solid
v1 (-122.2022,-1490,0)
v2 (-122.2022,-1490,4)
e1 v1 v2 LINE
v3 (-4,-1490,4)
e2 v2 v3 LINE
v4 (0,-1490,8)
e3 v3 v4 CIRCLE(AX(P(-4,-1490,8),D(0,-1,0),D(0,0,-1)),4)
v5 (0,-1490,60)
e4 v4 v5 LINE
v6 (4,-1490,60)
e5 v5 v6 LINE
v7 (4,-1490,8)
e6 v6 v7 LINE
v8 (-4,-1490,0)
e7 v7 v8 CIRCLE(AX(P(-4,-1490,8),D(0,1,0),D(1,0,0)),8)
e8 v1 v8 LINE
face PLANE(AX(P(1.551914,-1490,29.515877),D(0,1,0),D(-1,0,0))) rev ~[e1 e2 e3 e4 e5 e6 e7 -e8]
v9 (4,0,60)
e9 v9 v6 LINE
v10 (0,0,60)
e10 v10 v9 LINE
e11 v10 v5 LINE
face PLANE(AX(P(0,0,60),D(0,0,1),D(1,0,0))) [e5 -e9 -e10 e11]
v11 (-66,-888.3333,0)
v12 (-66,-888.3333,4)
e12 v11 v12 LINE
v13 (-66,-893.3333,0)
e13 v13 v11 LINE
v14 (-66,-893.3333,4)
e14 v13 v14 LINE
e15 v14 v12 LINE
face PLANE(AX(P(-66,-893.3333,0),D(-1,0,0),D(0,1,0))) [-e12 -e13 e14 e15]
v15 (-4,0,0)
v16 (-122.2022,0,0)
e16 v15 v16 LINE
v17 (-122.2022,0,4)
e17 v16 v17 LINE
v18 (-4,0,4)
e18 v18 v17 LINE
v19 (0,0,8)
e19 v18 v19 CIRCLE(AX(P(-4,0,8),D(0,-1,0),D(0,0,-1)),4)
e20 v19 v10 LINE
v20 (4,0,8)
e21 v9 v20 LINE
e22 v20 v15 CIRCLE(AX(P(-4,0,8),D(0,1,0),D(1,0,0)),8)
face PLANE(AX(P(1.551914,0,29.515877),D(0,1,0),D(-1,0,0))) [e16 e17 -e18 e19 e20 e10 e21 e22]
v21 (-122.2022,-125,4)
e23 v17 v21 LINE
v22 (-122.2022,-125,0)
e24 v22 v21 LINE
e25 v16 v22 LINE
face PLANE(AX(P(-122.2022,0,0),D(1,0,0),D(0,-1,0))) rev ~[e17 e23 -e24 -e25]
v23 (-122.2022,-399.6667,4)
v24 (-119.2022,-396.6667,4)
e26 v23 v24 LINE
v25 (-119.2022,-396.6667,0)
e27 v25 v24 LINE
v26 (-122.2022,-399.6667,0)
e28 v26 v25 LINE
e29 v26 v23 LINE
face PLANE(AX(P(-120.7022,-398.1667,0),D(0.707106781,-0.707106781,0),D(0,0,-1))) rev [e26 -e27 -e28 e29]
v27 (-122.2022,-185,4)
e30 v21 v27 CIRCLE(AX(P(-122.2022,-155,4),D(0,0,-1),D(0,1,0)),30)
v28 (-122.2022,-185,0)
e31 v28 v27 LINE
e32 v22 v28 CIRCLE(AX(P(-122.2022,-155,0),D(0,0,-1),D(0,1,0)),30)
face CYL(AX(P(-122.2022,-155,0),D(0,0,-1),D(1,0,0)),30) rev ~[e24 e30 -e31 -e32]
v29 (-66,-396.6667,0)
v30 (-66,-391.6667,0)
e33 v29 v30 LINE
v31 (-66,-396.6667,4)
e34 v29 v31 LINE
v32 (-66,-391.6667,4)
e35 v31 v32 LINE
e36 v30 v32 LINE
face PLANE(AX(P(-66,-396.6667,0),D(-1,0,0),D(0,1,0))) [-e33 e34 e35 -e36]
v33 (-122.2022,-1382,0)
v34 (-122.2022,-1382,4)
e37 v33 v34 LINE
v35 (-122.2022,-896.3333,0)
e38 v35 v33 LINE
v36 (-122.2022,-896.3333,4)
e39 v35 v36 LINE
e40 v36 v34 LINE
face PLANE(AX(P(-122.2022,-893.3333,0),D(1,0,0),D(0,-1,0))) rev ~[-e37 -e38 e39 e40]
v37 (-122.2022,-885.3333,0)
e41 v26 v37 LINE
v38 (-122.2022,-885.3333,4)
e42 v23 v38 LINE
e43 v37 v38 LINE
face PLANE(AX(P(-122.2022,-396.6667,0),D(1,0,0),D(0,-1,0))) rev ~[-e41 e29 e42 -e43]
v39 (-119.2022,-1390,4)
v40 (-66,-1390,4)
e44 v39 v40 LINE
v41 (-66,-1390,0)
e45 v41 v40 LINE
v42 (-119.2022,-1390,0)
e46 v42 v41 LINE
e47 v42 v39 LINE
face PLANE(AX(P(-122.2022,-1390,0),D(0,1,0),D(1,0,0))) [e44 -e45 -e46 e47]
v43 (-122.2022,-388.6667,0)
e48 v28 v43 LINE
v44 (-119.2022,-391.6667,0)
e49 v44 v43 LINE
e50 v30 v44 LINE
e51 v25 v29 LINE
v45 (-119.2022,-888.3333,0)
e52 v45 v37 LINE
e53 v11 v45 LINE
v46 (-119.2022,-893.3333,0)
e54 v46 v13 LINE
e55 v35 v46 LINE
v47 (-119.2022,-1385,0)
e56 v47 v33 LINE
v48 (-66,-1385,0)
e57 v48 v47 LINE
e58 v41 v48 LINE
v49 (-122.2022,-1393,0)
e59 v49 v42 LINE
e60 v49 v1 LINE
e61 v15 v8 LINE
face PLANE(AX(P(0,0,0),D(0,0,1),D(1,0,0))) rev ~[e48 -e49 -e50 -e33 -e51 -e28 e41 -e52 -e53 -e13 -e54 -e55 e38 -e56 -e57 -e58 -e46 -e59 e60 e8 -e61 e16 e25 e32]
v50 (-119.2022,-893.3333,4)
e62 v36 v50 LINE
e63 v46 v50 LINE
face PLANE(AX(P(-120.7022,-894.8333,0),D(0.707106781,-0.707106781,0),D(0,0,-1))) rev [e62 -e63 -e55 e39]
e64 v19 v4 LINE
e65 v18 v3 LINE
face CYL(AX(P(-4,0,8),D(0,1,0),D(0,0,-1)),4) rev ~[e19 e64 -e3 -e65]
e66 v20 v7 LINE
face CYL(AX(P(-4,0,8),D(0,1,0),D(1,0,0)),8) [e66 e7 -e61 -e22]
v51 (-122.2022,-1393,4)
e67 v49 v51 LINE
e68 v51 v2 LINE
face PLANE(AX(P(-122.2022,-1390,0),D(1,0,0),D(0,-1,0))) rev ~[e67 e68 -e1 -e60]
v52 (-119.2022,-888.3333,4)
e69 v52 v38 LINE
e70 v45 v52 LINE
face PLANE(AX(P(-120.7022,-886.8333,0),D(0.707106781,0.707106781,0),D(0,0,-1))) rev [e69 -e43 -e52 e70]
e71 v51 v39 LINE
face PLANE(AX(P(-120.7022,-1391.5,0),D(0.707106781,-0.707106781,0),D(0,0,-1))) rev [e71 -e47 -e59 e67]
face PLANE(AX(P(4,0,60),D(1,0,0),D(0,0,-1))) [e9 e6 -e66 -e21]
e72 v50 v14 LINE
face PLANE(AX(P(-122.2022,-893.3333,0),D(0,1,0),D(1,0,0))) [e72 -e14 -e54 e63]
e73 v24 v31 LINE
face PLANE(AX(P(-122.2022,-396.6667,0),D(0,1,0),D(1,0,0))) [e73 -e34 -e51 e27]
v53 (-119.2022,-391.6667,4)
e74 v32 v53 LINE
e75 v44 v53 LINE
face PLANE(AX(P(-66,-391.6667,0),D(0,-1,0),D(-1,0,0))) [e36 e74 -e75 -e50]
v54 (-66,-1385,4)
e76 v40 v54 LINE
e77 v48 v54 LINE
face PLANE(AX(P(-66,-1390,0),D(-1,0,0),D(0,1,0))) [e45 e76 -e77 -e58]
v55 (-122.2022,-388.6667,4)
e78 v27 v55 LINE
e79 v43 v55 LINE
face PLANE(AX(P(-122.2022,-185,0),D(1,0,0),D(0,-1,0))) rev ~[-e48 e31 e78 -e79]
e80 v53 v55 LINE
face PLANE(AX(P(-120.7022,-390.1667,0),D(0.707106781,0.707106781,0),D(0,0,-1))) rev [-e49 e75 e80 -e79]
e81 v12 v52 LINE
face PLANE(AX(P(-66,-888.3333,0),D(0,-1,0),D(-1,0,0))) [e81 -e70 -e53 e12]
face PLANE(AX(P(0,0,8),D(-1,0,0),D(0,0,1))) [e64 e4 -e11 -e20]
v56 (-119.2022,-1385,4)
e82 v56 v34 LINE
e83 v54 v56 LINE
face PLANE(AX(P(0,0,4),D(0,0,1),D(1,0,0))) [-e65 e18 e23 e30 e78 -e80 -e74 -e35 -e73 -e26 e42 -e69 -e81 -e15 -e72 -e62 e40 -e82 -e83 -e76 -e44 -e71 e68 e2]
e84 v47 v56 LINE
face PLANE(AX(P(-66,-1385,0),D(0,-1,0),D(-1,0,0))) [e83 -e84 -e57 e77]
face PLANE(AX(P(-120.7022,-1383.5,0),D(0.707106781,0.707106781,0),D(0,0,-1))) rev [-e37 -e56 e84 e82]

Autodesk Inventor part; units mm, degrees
ref_plane "YZ Plane" through (0, 0, 0) normal (1, 0, 0) x (0, 1, 0)
ref_plane "XZ Plane" through (0, 0, 0) normal (0, 1, 0) x (-1, 0, 0)
ref_plane "XY Plane" through (0, 0, 0) normal (0, 0, 1) x (1, 0, 0)
sketch "Sketch1" plane through (0, 0, 0) normal (0, 0, 1) x (1, 0, 0)
  line L0 (0, 0) -> (-122.2022, 0)
  line L1 (-122.2022, 0) -> (-122.2022, -1490)
  line L2 (-122.2022, -1490) -> (0, -1490)
  line L3 (0, -1490) -> (0, 0)
  line L4 (-122.2022, -1390) -> (-66, -1390)
  line L5 (-66, -1390) -> (-66, -1385)
  line L6 (-66, -1385) -> (-122.2022, -1385)
  line L7 (-122.2022, -1385) -> (-122.2022, -1390)
  line L8 (-122.2022, -893.3333) -> (-66, -893.3333)
  line L9 (-66, -893.3333) -> (-66, -888.3333)
  line L10 (-66, -888.3333) -> (-122.2022, -888.3333)
  line L11 (-122.2022, -888.3333) -> (-122.2022, -893.3333)
  line L12 (-122.2022, -396.6667) -> (-66, -396.6667)
  line L13 (-66, -396.6667) -> (-66, -391.6667)
  line L14 (-66, -391.6667) -> (-122.2022, -391.6667)
  line L15 (-122.2022, -391.6667) -> (-122.2022, -396.6667)
  circle A0 centre (-122.2022, -155) radius 30
  point P0 (-122.2022, -1385)
  point P1 (-122.2022, -125)
  point P2 (-122.2022, -185)
  dimension "d0" = 1490
  dimension "d1" = 122.2022
  dimension "d2" = 5
  dimension "d4" = 100
  dimension "d7" = 496.6667
  dimension "d23" = 66
  dimension "d28" = 60
  dimension "d29" = 1335
extrude "Plate1" add sketch "Sketch1" along normal blind 4 contours L3 L2 L1 L4 L5 L6 L8 L9 L10 L12 L13 L14 A0 L0
sketch "Sketch2" plane through (4, 0, 0) normal (-1, 0, 0) x (0, -1, 0)
  line L0 (1490, 0) -> (0, 0)
  line L1 (0, 0) -> (0, 60)
  line L2 (0, 60) -> (1490, 60)
  line L3 (1490, 60) -> (1490, 0)
edge flange "Flange1" height 60 angle 90 thickness 4 bend radius 4 thickness toward (-1, 0, 0) relief tear relief width 4 relief depth 2 edges at (0, -745, 4) wall of the first edge with corners at (4, -1490, 0) (4, 0, 0) (4, 0, 60) (4, -1490, 60)
bend "Bend1"
corner "Corner1"
chamfer "Corner Chamfer1" distance 3 angle 45 6 edges at (-122.2022, -1390, 2) (-122.2022, -1385, 2) (-122.2022, -893.3333, 2) (-122.2022, -888.3333, 2) (-122.2022, -391.6667, 2) (-122.2022, -396.6667, 2)
equation "\"d0\" = Стрингер_длина"
equation "\"d1\" = стрингер_глубина_7"
equation "\"d2\" = паз_под_стрингер_толщина"
equation "\"d7\" = 0.333333 * Стрингер_длина"
equation "\"d23\" = паз_под_стрингер_глубина - Thickness"
equation "\"d28\" = 2 * радиус_выреза_под_сварку"
equation "\"d12\" = Thickness"
equation "\"d13\" = BendReliefWidth"
equation "\"d14\" = BendReliefDepth"
equation "\"d15\" = MinimumRemnant"
equation "\"d16\" = TransitionRadius"
equation "\"d17\" = ребро_усилителей"
equation "\"d19\" = BendRadius"
equation "\"d20\" = CornerReliefSize"
equation "\"d21\" = GapSize"
equation "\"d22\" = JacobiRadiusSize"
equation "\"BendRadius\" = Thickness"
equation "\"BendReliefWidth\" = Thickness"
equation "\"BendReliefDepth\" = 0.5 * Thickness"
equation "\"CornerReliefSize\" = 4 * Thickness"
equation "\"MinimumRemnant\" = 2 * Thickness"
equation "\"TransitionRadius\" = BendRadius"
equation "\"JacobiRadiusSize\" = BendRadius"
equation "\"GapSize\" = Thickness"
equation "\"Стрингер_длина\" = 1490"
equation "\"стрингер_глубина_7\" = 122.202218"
equation "\"паз_под_стрингер_толщина\" = 5"
equation "\"паз_под_стрингер_глубина\" = 70"
equation "\"Thickness\" = 4"
equation "\"радиус_выреза_под_сварку\" = 30"
equation "\"ребро_усилителей\" = 60"
properties part number "GBK 1322 stringer 7" material "Steel"
